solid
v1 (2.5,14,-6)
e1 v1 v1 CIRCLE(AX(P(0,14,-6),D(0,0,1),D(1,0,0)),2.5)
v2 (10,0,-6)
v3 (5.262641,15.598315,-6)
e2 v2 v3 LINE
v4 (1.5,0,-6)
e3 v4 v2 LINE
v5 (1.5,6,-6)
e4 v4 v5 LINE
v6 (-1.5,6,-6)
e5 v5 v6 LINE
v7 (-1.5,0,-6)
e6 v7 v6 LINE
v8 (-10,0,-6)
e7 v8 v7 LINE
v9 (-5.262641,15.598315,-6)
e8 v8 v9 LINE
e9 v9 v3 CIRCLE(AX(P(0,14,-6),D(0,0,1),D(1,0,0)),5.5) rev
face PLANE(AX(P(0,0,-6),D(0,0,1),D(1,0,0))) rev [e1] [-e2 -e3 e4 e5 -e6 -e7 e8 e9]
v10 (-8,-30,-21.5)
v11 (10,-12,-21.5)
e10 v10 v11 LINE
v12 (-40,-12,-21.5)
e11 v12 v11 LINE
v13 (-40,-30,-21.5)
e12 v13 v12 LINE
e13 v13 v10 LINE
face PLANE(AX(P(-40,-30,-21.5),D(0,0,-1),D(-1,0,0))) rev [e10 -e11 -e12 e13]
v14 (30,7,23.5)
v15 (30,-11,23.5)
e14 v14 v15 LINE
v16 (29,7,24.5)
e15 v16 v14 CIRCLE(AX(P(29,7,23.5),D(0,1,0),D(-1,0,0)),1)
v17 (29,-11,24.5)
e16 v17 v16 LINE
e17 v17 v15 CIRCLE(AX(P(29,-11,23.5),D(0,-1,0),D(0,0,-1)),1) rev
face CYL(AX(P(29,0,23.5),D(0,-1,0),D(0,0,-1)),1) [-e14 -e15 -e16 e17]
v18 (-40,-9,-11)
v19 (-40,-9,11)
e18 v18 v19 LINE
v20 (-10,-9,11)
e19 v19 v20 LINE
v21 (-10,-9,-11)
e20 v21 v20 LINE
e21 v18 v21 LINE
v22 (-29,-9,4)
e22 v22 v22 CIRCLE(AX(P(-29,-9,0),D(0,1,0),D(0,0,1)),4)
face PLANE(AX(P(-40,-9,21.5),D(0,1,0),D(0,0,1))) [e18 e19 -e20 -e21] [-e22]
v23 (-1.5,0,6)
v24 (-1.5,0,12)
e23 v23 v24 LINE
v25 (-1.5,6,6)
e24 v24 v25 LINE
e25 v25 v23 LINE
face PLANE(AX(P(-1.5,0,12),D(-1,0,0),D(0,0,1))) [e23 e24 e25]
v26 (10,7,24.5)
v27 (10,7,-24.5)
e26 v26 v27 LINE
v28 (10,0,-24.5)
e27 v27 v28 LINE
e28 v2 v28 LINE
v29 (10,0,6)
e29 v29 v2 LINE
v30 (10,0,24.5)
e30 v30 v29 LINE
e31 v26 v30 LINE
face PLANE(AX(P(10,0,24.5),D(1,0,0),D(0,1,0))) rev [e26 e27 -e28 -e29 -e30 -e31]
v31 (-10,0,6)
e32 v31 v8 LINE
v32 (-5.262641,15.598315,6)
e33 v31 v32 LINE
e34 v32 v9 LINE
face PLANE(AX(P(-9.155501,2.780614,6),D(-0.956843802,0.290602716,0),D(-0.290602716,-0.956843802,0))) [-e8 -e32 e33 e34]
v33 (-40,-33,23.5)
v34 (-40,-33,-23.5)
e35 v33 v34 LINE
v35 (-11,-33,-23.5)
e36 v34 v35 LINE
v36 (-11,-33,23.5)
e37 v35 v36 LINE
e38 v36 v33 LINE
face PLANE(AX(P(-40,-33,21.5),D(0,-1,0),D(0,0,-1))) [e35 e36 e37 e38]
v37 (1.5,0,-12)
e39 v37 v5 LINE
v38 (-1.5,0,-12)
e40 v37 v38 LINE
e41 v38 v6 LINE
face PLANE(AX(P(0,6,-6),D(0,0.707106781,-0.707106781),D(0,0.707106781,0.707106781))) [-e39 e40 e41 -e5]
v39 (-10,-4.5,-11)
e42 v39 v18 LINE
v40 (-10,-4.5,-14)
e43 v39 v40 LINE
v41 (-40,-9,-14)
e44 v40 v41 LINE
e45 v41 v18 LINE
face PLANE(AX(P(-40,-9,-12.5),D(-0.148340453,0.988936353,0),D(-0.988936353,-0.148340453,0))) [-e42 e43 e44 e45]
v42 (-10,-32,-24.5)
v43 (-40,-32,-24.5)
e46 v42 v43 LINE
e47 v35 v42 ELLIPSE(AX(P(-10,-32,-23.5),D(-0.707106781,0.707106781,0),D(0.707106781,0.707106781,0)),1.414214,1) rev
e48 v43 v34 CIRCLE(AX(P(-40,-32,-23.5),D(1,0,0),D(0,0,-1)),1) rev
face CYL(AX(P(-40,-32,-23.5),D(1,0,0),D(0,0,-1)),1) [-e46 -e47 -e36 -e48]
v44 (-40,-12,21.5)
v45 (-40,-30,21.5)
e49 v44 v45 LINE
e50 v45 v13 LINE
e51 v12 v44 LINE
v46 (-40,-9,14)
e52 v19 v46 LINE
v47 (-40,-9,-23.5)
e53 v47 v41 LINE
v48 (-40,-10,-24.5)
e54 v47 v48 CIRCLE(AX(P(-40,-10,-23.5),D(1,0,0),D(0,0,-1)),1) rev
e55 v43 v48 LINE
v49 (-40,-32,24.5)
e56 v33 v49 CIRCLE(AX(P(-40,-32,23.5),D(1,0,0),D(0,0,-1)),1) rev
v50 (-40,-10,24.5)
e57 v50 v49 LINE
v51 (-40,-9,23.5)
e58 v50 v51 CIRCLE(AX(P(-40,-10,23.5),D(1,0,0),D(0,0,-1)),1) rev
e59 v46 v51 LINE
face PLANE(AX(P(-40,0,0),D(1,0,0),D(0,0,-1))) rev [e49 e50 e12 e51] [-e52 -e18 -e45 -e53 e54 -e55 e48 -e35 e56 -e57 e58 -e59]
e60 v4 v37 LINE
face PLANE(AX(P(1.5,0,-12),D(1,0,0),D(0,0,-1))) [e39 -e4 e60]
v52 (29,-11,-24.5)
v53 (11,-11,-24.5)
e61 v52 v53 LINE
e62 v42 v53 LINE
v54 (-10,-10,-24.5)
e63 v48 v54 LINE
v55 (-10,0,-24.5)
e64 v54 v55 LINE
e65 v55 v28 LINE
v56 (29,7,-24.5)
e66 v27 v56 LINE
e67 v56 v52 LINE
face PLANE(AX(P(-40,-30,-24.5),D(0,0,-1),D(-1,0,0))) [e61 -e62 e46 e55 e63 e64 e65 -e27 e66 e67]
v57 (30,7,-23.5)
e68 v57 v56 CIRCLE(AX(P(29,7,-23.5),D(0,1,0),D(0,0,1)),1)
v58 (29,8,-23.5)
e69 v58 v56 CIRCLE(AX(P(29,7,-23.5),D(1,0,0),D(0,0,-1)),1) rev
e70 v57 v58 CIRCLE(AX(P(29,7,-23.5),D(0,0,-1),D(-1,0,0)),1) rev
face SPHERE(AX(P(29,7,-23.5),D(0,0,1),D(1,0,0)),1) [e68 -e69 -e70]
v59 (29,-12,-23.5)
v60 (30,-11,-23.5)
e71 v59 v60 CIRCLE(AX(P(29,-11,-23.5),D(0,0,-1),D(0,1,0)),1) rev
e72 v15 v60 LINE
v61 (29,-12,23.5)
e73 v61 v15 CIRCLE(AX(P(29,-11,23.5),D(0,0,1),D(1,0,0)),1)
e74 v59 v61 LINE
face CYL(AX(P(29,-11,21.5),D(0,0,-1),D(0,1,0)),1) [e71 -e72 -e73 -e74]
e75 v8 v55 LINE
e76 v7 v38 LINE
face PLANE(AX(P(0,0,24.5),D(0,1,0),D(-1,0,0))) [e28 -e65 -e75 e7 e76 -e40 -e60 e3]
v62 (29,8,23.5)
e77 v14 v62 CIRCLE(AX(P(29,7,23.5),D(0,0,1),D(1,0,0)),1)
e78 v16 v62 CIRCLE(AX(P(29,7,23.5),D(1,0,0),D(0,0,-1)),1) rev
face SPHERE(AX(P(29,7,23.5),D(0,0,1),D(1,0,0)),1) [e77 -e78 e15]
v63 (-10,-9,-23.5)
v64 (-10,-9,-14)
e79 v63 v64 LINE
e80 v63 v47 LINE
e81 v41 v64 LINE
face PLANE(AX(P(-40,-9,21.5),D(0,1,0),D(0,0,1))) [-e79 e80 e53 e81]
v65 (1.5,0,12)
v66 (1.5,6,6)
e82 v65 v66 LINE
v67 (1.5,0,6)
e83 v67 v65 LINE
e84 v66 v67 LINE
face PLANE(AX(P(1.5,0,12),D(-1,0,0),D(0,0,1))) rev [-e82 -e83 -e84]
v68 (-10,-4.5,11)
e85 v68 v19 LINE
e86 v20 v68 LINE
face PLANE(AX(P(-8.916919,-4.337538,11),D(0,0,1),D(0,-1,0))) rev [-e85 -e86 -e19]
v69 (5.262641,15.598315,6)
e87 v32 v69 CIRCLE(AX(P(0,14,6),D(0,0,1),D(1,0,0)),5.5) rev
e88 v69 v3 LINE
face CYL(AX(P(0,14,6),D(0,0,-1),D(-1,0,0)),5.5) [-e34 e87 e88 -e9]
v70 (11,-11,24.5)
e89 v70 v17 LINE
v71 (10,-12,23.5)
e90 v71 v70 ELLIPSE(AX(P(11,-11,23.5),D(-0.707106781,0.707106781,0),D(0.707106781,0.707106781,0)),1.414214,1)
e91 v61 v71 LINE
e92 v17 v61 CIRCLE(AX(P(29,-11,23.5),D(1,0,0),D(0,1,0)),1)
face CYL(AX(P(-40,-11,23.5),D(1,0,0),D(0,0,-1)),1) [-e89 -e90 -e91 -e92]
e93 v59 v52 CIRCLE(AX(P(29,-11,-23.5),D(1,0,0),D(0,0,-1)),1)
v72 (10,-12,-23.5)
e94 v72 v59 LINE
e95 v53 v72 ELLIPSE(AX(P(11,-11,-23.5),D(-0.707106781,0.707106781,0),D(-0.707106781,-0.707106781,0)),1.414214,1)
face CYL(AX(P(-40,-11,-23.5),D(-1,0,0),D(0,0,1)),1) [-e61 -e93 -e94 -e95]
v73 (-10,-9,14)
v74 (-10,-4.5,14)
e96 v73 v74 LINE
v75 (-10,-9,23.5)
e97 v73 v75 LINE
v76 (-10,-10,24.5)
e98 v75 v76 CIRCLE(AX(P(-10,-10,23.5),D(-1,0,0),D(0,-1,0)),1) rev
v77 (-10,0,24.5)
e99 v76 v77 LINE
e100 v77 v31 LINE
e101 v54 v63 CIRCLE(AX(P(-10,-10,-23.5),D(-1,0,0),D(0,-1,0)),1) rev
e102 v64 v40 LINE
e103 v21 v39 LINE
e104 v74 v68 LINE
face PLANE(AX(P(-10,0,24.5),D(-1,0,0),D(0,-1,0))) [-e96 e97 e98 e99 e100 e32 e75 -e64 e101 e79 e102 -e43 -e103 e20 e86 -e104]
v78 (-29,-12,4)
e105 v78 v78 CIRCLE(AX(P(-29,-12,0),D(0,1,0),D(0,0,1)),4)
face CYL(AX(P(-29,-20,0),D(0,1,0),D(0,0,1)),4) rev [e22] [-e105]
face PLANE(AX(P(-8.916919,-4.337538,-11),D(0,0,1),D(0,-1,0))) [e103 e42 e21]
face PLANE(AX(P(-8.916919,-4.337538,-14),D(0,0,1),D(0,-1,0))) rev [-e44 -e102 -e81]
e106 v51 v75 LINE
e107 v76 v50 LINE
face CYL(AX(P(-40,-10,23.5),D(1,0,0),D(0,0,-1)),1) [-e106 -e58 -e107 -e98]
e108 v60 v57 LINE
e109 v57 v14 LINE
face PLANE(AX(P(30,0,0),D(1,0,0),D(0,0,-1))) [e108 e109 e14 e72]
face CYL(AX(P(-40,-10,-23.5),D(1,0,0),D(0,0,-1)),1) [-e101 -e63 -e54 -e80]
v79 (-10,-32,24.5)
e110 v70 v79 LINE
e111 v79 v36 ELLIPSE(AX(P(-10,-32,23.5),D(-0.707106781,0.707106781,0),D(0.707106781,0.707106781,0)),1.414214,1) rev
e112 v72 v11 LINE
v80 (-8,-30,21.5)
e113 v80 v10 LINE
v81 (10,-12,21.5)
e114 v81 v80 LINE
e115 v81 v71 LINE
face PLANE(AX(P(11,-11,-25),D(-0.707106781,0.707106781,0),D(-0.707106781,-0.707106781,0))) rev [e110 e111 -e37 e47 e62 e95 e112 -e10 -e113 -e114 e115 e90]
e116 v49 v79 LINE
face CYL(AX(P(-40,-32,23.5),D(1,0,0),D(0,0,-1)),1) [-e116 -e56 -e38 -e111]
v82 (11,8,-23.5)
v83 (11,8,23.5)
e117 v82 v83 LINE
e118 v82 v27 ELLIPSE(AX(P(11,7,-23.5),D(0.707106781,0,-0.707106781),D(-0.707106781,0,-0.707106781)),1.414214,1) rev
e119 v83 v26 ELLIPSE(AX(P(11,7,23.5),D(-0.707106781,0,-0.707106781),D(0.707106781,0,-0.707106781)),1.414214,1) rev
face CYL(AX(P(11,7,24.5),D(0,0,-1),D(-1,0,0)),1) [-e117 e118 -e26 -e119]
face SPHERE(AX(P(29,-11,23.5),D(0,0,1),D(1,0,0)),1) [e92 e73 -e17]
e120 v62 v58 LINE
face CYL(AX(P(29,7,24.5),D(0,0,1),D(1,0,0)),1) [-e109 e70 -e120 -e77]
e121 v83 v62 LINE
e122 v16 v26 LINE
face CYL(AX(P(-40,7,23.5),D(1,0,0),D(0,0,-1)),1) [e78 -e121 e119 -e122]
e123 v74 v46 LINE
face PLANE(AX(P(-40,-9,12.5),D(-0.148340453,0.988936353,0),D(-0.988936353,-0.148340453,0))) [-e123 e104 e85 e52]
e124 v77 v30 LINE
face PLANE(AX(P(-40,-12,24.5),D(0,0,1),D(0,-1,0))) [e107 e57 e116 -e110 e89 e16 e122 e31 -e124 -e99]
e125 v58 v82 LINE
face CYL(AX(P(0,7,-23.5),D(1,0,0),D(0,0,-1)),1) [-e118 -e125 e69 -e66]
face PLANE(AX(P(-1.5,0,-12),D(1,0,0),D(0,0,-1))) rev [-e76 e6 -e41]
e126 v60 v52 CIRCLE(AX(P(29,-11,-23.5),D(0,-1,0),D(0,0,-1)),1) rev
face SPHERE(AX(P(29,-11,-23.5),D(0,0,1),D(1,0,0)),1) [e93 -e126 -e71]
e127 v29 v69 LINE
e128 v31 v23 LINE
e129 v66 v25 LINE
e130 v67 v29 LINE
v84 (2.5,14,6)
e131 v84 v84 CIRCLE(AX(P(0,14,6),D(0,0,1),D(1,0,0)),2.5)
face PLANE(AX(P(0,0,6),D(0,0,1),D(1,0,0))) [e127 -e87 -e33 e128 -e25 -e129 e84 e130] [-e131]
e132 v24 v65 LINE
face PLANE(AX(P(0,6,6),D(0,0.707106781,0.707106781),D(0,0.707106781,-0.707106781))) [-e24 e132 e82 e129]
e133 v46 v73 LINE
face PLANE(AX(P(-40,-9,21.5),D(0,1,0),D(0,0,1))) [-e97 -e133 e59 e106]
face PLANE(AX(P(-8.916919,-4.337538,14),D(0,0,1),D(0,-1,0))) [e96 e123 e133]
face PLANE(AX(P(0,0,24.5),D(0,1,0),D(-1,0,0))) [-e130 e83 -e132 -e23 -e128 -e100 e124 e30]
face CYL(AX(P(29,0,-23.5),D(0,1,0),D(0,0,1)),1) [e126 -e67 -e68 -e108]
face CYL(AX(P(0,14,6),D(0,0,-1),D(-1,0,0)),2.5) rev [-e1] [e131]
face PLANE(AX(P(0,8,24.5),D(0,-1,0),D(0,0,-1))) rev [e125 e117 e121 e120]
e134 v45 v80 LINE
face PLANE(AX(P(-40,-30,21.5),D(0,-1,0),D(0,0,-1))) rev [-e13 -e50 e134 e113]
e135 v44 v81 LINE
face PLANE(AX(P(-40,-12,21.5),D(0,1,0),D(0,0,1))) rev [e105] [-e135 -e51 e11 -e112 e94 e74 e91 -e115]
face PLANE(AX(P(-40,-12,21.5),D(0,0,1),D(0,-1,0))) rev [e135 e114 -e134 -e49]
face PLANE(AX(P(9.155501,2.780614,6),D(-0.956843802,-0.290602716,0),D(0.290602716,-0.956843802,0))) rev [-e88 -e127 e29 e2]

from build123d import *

# Parameters (mm, degrees)
EXTRUDE_1_DEPTH         = 30
EXTRUDE_1_DEPTH_BACK    = 40
SKETCH_2_W              = 49
SKETCH_2_H              = 24
SKETCH_2_W_2            = 43
SKETCH_2_H_2            = 18
SKETCH_1_R              = 2.5
EXTRUDE_1_2_DEPTH       = 6
SKETCH_1_3_W            = 20
SKETCH_1_3_H            = 8
EXTRUDE_2_DEPTH         = 24.5
CUT_EXTRUDE_1_DEPTH     = 25
RIB_1_REACH             = 58.032
SKETCH_4_WALLS_W        = 145.49538697
SKETCH_4_WALLS_H        = 3
RIB_2_REACH             = 65.649
SKETCH_6_WALLS_W        = 3
SKETCH_6_WALLS_H        = 137.784142328
CUT_EXTRUDE_START       = -12
CUT_EXTRUDE_2_OUTLINE_R = 4
CUT_EXTRUDE_2_DEPTH     = 3
FILLET_1_R              = 1


# Read off the part's stored shape, not the designer's step: 컷-돌출2
with BuildPart() as part:
    # 스케치2 → Extrude 1 (new, two sides: drawn at the far end of the back side and taken through both)
    with BuildSketch(Plane(origin=(0, 0, 0), x_dir=(0, 0, -1), z_dir=(1, 0, 0)).offset(-EXTRUDE_1_DEPTH_BACK)):
        with Locations((0, -21)):
            Rectangle(SKETCH_2_W, SKETCH_2_H)
        with Locations((0, -21)):
            Rectangle(SKETCH_2_W_2, SKETCH_2_H_2, mode=Mode.SUBTRACT)
    extrude(amount=EXTRUDE_1_DEPTH + EXTRUDE_1_DEPTH_BACK)



with BuildPart() as body_2:
    # 스케치1 → Extrude 1 2 (new, symmetric)
    with BuildSketch(Plane.XY):
        with BuildLine():
            ThreePointArc((-5.262640911, 15.598314937), (0, 19.5), (5.262640911, 15.598314937))
            Line((5.262640911, 15.598314937), (10, 0))
            Line((10, 0), (-10, 0))
            Line((-10, 0), (-5.262640911, 15.598314937))
        make_face()
        with Locations((0, 14)):
            Circle(SKETCH_1_R, mode=Mode.SUBTRACT)
    extrude(amount=EXTRUDE_1_2_DEPTH, both=True)


with BuildPart() as part_1:
    add(part.part)

    add(body_2.part)  # 보스-돌출2 merges body 2
    # 스케치1<3> → 보스-돌출2 (add, symmetric)
    with BuildSketch(Plane.XY):
        Polygon((10, 0), (-10, 0), (-10, -12), (10, -12), (30, -12), (30, 0), align=None)
        with Locations((20, 4)):
            Rectangle(SKETCH_1_3_W, SKETCH_1_3_H)
    extrude(amount=EXTRUDE_2_DEPTH, both=True)

    # 스케치1<4> → 컷-돌출1 (cut, symmetric)
    with BuildSketch(Plane.XY):
        Polygon((30, -12), (10, -12), (-11, -33), (30, -33), align=None)
    extrude(amount=CUT_EXTRUDE_1_DEPTH, both=True, mode=Mode.SUBTRACT)

    # 스케치4 walls → 보강대1 (add, up to next)
    with BuildSketch(Plane(origin=(0.4400978, -2.93398533, 0), x_dir=(0.9889363528682976, 0.14834045293024456, 0), z_dir=(-0.14834045293024456, 0.9889363528682976, 0)), mode=Mode.PRIVATE) as rib_1_sk1:
        with Locations((-25.177107795, -12.5)):
            Rectangle(SKETCH_4_WALLS_W, SKETCH_4_WALLS_H)
    rib_1_tool1 = extrude(rib_1_sk1.sketch, amount=-RIB_1_REACH, mode=Mode.PRIVATE) - part_1.part
    # 스케치4 walls → 보강대1 (add, up to next)
    with BuildSketch(Plane(origin=(0.4400978, -2.93398533, 0), x_dir=(0.9889363528682976, 0.14834045293024456, 0), z_dir=(-0.14834045293024456, 0.9889363528682976, 0)), mode=Mode.PRIVATE) as rib_1_sk2:
        with Locations((-25.177107795, 12.5)):
            Rectangle(SKETCH_4_WALLS_W, SKETCH_4_WALLS_H)
    rib_1_tool2 = extrude(rib_1_sk2.sketch, amount=-RIB_1_REACH, mode=Mode.PRIVATE) - part_1.part
    add(rib_1_tool1.solids().sort_by_distance((-24.458459359, -6.668768904, 12.5))[0])
    add(rib_1_tool2.solids().sort_by_distance((-24.458459359, -6.668768904, -12.5))[0])

    # 스케치6 walls → 보강대2 (add, up to next)
    with BuildSketch(Plane(origin=(0, 6, -6), x_dir=(1, 0, 0), z_dir=(0, 0.7071067811865477, -0.7071067811865474)), mode=Mode.PRIVATE) as rib_2_sk1:
        with Locations((0, 4.242640687)):
            Rectangle(SKETCH_6_WALLS_W, SKETCH_6_WALLS_H)
    rib_2_tool1 = extrude(rib_2_sk1.sketch, amount=-RIB_2_REACH, mode=Mode.PRIVATE) - part_1.part
    rib_2 = rib_2_tool1.solids().sort_by_distance((0, 3, -9))[0]
    add(rib_2)

    # 대칭 복사1: 보강대2 across plane
    add(rib_2.mirror(Plane.XY))

    # 컷-돌출2 outline → 컷-돌출2 (cut)
    with BuildSketch(Plane(origin=(0, 0, 0), x_dir=(1, 0, 0), z_dir=(0, 1, 0)).offset(CUT_EXTRUDE_START)):
        with Locations((-29, 0)):
            Circle(CUT_EXTRUDE_2_OUTLINE_R)
    extrude(amount=CUT_EXTRUDE_2_DEPTH, mode=Mode.SUBTRACT)

    # 필렛1
    fillet_1_edges = [part_1.edges().sort_by_distance(p)[0] for p in [
        (30, -2, 24.5),
        (30, -12, 0),
        (20, 8, -24.5),
        (30, 8, 0),
        (10, 8, 0),
        (20, 8, 24.5),
        (-25.5, -33, 24.5),
        (-25, -9, 24.5),
        (-25, -9, -24.5),
        (-25.5, -33, -24.5),
        (30, -2, -24.5),
        (20, -12, 24.5),
        (20, -12, -24.5),
    ]]
    fillet(fillet_1_edges, radius=FILLET_1_R)


solid = part_1.part
